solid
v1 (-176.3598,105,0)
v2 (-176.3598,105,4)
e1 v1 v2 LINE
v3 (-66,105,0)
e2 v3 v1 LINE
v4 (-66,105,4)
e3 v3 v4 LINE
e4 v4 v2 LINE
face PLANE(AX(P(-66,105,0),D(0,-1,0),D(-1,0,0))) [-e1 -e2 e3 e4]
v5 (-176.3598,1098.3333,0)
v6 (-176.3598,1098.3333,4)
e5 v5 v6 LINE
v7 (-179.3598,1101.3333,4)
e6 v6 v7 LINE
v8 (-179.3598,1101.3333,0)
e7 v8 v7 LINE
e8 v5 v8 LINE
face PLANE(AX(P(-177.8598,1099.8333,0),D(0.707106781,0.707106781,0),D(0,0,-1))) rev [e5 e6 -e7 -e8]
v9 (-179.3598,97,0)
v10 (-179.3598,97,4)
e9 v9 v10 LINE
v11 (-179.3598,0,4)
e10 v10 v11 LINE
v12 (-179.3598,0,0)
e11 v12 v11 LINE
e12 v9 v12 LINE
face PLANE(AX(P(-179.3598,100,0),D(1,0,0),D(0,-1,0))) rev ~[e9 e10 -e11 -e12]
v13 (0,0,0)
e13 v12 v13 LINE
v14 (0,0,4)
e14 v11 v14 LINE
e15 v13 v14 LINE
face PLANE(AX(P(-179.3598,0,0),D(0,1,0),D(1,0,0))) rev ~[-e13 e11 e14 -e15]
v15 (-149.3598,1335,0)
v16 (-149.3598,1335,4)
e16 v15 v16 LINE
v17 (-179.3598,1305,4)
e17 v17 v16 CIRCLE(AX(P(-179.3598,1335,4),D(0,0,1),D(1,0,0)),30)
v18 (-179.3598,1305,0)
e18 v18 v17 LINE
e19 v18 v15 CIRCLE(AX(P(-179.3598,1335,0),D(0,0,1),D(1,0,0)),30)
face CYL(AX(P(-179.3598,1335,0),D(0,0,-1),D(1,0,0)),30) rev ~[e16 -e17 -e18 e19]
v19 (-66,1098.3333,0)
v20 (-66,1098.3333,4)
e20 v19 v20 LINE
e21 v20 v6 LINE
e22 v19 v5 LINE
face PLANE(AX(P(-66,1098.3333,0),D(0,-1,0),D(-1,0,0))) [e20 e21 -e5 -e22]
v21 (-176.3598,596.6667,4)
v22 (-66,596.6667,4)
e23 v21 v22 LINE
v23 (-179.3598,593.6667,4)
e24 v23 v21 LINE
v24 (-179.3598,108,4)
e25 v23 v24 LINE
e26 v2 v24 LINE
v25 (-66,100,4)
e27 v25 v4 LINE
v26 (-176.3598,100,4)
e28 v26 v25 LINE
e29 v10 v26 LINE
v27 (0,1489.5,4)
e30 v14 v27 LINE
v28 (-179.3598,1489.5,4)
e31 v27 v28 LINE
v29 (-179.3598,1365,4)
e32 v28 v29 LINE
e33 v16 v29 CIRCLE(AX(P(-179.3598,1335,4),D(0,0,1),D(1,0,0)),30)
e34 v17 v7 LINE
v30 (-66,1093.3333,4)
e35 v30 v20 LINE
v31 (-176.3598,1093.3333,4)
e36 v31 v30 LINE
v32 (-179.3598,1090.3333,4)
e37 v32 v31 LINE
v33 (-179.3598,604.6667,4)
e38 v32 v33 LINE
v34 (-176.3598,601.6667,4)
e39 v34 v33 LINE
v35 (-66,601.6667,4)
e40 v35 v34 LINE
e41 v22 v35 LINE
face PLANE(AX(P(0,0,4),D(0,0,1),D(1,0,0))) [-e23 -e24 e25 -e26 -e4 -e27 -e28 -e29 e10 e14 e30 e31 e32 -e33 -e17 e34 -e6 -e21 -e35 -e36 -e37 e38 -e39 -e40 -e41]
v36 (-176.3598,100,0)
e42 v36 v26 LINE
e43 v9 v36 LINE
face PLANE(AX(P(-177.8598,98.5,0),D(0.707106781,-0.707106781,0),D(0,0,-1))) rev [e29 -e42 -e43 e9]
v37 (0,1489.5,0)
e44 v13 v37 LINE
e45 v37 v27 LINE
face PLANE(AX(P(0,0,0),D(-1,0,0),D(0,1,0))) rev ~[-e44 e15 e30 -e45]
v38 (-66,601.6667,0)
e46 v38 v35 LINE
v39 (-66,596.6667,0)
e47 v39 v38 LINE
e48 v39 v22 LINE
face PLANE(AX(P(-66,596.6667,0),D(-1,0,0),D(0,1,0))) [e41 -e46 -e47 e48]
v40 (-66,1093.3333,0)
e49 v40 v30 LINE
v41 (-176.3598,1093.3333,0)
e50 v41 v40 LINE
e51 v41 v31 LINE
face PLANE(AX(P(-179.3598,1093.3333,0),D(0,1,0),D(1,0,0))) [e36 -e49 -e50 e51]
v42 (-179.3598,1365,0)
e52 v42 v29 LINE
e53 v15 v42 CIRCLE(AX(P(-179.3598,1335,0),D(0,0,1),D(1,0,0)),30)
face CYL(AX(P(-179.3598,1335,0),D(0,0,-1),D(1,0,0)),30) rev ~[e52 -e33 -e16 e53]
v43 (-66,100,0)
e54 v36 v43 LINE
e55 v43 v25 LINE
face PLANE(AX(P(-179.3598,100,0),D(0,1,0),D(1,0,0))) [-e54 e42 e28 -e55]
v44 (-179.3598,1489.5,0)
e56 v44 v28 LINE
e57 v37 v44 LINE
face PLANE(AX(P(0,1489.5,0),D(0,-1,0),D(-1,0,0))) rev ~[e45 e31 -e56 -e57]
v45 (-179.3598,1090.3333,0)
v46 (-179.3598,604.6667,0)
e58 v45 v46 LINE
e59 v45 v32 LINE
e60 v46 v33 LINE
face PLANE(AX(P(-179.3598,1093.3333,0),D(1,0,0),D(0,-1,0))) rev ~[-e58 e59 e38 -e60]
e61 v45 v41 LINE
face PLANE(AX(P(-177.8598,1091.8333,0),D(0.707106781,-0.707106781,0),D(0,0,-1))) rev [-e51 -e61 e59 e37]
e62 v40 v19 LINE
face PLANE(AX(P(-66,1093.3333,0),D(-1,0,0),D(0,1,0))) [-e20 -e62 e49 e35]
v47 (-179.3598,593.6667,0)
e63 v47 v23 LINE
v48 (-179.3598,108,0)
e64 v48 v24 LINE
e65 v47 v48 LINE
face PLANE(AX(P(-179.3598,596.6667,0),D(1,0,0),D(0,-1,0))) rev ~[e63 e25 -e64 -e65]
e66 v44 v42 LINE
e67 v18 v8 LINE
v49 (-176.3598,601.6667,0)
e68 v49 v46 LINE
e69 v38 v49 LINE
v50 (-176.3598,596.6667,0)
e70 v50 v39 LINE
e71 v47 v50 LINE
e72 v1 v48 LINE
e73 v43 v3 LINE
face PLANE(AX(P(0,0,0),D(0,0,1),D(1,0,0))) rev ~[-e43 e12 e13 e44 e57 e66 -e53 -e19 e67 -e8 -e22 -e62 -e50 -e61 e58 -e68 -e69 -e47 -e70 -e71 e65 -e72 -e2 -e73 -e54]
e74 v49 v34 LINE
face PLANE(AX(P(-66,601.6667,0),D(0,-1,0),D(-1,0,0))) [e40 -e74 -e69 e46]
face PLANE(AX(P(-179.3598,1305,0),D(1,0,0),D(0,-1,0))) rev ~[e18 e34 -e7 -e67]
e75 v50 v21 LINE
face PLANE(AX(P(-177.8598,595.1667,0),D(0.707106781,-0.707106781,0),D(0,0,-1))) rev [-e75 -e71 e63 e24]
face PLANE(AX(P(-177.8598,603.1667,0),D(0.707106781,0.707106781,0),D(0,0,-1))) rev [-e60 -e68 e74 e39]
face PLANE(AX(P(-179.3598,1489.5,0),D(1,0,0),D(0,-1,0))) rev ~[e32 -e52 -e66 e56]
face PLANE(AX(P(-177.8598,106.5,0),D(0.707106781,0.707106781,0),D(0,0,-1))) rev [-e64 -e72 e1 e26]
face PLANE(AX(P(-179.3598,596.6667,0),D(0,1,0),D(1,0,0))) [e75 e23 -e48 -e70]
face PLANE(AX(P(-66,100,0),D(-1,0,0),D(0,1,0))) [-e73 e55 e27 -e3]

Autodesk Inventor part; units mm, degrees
ref_plane "YZ Plane" through (0, 0, 0) normal (1, 0, 0) x (0, 1, 0)
ref_plane "XZ Plane" through (0, 0, 0) normal (0, 1, 0) x (-1, 0, 0)
ref_plane "XY Plane" through (0, 0, 0) normal (0, 0, 1) x (1, 0, 0)
sketch "Sketch1" plane through (0, 0, 0) normal (0, 0, 1) x (1, 0, 0)
  line L0 (0, 1489.5) -> (-179.3598, 1489.5)
  line L1 (-179.3598, 1489.5) -> (-179.3598, 0)
  line L2 (-179.3598, 0) -> (0, 0)
  line L3 (0, 0) -> (0, 1489.5)
  line L4 (-179.3598, 100) -> (-66, 100)
  line L5 (-66, 100) -> (-66, 105)
  line L6 (-66, 105) -> (-179.3598, 105)
  line L7 (-179.3598, 105) -> (-179.3598, 100)
  line L8 (-179.3598, 596.6667) -> (-66, 596.6667)
  line L9 (-66, 596.6667) -> (-66, 601.6667)
  line L10 (-66, 601.6667) -> (-179.3598, 601.6667)
  line L11 (-179.3598, 601.6667) -> (-179.3598, 596.6667)
  line L12 (-179.3598, 1093.3333) -> (-66, 1093.3333)
  line L13 (-66, 1093.3333) -> (-66, 1098.3333)
  line L14 (-66, 1098.3333) -> (-179.3598, 1098.3333)
  line L15 (-179.3598, 1098.3333) -> (-179.3598, 1093.3333)
  circle A0 centre (-179.3598, 1335) radius 30
  point P0 (-179.3598, 1093.3333)
  point P1 (-179.3598, 596.6667)
  point P2 (-179.3598, 1365)
  point P3 (-179.3598, 1305)
  dimension "d0" = 1489.5
  dimension "d1" = 179.3598
  dimension "d2" = 5
  dimension "d4" = 100
  dimension "d7" = 496.6667
  dimension "d23" = 66
  dimension "d29" = 60
  dimension "d30" = 1335
extrude "Plate1" add sketch "Sketch1" along normal blind 4 contours L3 L2 L1 L4 L5 L6 L8 L9 L10 L12 L13 L14 A0 L0
chamfer "Corner Chamfer1" distance 3 angle 45 6 edges at (-179.3598, 100, 2) (-179.3598, 105, 2) (-179.3598, 596.6667, 2) (-179.3598, 601.6667, 2) (-179.3598, 1098.3333, 2) (-179.3598, 1093.3333, 2)
equation "\"d0\" = Стрингер_длина"
equation "\"d1\" = стрингер_глубина_2"
equation "\"d2\" = паз_под_стрингер_толщина"
equation "\"d7\" = Шаг_шпангоутов"
equation "\"d23\" = паз_под_стрингер_глубина - Thickness"
equation "\"d29\" = 2 * радиус_выреза_под_сварку"
equation "\"d12\" = Thickness"
equation "\"BendRadius\" = Thickness"
equation "\"BendReliefWidth\" = Thickness"
equation "\"BendReliefDepth\" = 0.5 * Thickness"
equation "\"CornerReliefSize\" = 4 * Thickness"
equation "\"MinimumRemnant\" = 2 * Thickness"
equation "\"TransitionRadius\" = BendRadius"
equation "\"JacobiRadiusSize\" = BendRadius"
equation "\"GapSize\" = Thickness"
equation "\"Стрингер_длина\" = 1489.5"
equation "\"стрингер_глубина_2\" = 179.359772"
equation "\"паз_под_стрингер_толщина\" = 5"
equation "\"Шаг_шпангоутов\" = 496.666667"
equation "\"паз_под_стрингер_глубина\" = 70"
equation "\"Thickness\" = 4"
equation "\"радиус_выреза_под_сварку\" = 30"
properties part number "GBK 3114 stringer 2" material "Steel"
